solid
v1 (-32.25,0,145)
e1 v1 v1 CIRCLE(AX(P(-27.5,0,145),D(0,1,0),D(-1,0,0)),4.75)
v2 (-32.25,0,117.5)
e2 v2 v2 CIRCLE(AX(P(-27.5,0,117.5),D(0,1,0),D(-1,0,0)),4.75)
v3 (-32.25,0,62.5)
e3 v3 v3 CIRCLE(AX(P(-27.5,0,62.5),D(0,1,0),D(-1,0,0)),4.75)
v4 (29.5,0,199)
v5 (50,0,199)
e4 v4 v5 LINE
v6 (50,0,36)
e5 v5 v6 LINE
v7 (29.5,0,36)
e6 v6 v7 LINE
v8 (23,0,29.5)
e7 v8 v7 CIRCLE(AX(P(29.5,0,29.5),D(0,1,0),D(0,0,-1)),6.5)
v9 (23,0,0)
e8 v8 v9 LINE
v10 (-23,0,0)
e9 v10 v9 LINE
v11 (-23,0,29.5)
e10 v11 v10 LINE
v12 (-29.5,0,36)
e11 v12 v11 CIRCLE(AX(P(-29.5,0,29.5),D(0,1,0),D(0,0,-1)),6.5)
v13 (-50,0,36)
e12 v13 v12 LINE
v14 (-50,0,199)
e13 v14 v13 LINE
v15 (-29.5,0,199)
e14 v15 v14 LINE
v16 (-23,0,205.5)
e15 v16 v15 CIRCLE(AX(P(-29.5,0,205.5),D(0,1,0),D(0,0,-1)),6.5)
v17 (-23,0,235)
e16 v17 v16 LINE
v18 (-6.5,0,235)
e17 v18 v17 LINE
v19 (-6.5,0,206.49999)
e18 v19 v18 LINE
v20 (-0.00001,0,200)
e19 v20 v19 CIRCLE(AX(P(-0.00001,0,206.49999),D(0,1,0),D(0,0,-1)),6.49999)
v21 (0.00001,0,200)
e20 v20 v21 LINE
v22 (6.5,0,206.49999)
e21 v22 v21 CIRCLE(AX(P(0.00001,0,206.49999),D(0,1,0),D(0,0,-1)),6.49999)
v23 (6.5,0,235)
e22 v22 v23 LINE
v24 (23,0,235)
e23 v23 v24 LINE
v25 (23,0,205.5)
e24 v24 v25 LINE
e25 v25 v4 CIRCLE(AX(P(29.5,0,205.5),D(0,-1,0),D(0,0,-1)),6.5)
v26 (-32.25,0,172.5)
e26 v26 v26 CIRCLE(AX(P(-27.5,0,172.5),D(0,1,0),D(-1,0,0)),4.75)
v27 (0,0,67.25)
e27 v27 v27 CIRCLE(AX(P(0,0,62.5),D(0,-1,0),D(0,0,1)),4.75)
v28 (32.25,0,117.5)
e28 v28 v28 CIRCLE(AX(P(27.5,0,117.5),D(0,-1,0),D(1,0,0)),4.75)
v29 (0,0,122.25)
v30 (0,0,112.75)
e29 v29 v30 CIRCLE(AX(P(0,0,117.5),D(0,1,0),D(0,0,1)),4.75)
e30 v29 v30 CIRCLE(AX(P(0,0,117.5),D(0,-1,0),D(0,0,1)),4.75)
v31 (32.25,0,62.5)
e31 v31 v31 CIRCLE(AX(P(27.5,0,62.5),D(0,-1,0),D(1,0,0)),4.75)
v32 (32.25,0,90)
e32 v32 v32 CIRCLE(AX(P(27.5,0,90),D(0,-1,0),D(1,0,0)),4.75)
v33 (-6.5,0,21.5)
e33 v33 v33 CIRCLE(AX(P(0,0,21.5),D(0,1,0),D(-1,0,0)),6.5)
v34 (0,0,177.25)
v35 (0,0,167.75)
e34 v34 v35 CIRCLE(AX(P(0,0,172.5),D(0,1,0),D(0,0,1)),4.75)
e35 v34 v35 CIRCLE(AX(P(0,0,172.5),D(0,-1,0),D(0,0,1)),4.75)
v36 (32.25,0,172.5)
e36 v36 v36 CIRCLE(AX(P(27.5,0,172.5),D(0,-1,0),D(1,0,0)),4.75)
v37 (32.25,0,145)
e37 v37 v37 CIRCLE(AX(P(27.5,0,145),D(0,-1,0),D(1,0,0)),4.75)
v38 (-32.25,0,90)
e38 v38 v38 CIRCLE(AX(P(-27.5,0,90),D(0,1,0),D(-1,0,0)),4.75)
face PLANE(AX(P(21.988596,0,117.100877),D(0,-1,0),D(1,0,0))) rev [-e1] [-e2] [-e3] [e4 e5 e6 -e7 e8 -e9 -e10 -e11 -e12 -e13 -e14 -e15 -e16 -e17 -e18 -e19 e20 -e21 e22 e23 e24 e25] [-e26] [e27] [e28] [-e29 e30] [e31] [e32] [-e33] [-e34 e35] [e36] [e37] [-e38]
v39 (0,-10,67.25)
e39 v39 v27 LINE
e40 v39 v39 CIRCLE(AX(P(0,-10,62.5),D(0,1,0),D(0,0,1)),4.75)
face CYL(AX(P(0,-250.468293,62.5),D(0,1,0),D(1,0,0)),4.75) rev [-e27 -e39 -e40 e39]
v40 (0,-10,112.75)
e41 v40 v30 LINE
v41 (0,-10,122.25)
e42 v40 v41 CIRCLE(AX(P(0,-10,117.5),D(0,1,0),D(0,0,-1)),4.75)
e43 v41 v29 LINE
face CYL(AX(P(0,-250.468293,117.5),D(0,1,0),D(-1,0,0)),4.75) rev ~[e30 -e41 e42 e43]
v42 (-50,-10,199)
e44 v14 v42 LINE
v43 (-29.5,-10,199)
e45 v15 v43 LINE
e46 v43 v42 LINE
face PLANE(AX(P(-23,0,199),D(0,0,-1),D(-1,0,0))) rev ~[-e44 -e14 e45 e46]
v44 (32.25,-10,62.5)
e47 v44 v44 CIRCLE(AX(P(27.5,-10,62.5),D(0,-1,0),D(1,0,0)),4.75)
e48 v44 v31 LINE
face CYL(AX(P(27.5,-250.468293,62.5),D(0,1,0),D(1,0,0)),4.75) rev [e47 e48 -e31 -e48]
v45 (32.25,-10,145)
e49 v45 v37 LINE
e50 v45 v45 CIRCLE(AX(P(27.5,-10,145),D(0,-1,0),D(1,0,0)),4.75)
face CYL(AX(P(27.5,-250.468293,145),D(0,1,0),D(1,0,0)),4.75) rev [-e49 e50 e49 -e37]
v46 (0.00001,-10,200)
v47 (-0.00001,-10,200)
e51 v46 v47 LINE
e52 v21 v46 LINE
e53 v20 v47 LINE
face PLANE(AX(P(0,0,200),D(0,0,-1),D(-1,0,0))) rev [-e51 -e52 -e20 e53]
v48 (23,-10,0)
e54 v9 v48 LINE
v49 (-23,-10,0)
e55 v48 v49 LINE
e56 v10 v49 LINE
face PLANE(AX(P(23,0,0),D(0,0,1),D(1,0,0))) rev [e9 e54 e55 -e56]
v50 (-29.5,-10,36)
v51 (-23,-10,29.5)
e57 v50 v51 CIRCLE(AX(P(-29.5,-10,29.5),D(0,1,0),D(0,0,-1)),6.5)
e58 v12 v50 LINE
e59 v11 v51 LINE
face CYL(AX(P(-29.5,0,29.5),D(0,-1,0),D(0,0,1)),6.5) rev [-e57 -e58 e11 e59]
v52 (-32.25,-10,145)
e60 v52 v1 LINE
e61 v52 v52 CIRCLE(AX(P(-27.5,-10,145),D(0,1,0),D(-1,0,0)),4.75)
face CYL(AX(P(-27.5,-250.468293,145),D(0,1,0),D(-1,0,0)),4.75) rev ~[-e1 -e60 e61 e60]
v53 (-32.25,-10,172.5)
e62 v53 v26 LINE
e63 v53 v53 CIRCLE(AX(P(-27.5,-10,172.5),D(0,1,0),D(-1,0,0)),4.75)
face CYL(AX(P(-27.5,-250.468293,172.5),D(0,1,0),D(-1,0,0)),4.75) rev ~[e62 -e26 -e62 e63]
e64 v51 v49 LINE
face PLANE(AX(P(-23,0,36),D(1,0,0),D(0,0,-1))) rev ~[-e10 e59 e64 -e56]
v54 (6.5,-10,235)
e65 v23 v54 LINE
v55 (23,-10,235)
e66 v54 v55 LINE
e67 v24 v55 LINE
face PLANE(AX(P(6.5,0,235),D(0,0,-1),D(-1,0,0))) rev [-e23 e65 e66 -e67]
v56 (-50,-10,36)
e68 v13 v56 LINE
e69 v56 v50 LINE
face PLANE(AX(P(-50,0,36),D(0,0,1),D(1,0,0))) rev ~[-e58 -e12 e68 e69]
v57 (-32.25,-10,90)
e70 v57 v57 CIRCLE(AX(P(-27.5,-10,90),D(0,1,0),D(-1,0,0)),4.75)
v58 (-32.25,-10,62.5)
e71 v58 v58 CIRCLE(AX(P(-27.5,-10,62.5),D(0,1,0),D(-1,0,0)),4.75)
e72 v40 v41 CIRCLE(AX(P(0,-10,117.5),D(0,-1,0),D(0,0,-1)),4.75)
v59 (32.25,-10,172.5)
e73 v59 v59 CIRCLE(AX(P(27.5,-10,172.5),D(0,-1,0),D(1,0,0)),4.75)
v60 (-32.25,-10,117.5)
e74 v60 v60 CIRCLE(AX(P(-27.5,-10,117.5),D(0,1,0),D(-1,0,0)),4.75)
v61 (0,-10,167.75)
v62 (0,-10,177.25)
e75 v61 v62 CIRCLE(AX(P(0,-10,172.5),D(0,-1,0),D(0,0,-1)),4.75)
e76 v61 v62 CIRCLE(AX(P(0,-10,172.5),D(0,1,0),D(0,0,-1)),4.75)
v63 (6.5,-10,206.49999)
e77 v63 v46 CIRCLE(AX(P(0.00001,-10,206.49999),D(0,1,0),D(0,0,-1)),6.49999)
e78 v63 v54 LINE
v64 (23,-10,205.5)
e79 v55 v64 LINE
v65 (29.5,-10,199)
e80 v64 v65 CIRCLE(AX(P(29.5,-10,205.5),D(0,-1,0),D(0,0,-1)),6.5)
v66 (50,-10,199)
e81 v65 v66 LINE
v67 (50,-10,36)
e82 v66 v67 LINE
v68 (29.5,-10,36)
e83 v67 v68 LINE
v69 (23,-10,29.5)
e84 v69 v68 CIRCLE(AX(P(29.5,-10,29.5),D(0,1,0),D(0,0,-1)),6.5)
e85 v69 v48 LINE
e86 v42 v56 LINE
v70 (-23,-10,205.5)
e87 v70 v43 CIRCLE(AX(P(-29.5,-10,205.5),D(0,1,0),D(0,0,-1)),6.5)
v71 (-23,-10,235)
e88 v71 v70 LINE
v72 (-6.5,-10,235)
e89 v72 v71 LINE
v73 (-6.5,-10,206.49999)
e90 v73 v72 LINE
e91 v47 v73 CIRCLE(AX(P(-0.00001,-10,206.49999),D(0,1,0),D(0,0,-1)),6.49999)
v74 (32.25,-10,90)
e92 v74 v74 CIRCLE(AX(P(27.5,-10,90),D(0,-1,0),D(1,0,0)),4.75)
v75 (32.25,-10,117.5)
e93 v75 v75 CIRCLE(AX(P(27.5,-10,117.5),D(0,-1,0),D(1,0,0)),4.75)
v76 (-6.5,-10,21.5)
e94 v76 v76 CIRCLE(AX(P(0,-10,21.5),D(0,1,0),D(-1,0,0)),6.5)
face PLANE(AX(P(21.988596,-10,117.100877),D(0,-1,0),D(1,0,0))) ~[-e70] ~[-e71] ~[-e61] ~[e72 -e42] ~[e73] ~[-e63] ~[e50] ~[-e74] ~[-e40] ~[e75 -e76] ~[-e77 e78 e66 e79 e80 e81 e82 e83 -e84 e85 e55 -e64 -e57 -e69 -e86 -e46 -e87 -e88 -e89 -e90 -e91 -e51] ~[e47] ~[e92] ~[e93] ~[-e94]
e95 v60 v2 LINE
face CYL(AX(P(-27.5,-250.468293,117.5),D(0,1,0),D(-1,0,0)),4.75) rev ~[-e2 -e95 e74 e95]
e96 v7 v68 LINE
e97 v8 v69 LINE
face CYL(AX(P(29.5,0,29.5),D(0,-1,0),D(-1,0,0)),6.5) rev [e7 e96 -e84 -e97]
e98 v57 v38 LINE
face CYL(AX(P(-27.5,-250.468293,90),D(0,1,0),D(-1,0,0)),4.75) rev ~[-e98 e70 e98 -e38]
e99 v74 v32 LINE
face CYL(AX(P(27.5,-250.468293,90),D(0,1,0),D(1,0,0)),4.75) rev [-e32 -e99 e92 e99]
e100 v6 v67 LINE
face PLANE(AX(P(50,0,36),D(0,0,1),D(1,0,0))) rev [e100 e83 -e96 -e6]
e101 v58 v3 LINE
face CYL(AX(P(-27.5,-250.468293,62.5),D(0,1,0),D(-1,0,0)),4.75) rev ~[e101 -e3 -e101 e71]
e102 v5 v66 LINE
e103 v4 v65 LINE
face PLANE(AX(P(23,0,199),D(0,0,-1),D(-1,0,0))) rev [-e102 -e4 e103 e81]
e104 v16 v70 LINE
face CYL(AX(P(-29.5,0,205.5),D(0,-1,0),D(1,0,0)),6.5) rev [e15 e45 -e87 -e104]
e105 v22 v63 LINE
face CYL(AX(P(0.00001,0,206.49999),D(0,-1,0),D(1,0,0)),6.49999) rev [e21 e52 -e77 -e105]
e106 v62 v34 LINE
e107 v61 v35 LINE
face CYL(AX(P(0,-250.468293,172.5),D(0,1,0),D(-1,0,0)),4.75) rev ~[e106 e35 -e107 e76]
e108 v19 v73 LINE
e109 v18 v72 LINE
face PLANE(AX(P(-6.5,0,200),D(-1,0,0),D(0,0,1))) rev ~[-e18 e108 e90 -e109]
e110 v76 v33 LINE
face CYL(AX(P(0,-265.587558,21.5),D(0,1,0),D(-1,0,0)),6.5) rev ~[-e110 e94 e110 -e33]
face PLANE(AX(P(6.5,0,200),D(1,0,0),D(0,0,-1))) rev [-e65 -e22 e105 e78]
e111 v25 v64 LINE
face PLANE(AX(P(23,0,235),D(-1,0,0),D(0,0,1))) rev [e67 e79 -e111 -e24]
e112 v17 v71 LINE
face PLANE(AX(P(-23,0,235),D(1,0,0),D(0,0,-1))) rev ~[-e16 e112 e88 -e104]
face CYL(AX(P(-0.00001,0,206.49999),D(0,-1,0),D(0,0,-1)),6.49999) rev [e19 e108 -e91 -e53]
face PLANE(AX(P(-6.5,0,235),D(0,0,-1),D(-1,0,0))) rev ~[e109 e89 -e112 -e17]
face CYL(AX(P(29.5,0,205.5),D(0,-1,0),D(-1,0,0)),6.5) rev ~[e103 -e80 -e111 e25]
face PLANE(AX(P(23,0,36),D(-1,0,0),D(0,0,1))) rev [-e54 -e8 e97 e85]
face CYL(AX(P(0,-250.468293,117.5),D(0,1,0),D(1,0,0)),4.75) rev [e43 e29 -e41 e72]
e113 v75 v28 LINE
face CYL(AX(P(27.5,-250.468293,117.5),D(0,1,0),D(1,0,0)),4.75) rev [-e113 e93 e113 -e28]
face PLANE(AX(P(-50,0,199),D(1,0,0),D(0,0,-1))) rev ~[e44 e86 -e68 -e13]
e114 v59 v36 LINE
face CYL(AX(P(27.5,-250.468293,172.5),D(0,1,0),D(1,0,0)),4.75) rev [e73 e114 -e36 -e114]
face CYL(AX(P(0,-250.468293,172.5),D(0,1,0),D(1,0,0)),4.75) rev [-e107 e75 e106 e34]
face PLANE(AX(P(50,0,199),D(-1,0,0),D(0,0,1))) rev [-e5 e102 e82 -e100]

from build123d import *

# Parameters (mm, degrees)
F1_DEPTH = 10
F3_D     = 9.5
F7_D     = 13
F8_R     = 6.49999
F9_R     = 6.5


# Not quite as in the source:
# - a fillet or chamfer is up to 0.001 mm smaller than in the source, because OpenCascade refuses the exact size


with BuildPart() as f1:
    # F0 (on Front) → F1 (new body)
    with BuildSketch(Plane.XZ):
        Polygon((-23, 0), (0, 0), (0, 200), (-6.5, 200), (-6.5, 235), (-23, 235), (-23, 199), (-50, 199), (-50, 36), (-23, 36), align=None)
    extrude(amount=F1_DEPTH)

    # F3 (through all)
    with Locations(Plane.XZ.offset(10)):
        with Locations((-27.5, 172.5), (-27.5, 145), (-27.5, 117.5), (-27.5, 90), (-27.5, 62.5), (0, 62.5), (0, 117.5), (0, 172.5)):
            Hole(F3_D / 2)

    # F4: F1 across face


with BuildPart() as f1_1:
    add(f1.part)
    add(f1.part.mirror(Plane(origin=(0, -5, 90), x_dir=(0, 1, 0), z_dir=(1, 0, 0))))

    # F7 (through all)
    with Locations(Plane.XZ.offset(10)):
        with Locations((0, 21.5)):
            Hole(F7_D / 2)

    # F8 (radius 6.5 in the source; OpenCascade refuses exactly that, so slightly less here)
    f8_edges = [f1_1.edges().sort_by_distance(p)[0] for p in [
        (-6.5, -5, 200),
        (6.5, -5, 200),
    ]]
    fillet(f8_edges, radius=F8_R)

    # F9
    f9_edges = [f1_1.edges().sort_by_distance(p)[0] for p in [
        (23, -5, 199),
        (-23, -5, 199),
        (23, -5, 36),
        (-23, -5, 36),
    ]]
    fillet(f9_edges, radius=F9_R)


solid = f1_1.part
